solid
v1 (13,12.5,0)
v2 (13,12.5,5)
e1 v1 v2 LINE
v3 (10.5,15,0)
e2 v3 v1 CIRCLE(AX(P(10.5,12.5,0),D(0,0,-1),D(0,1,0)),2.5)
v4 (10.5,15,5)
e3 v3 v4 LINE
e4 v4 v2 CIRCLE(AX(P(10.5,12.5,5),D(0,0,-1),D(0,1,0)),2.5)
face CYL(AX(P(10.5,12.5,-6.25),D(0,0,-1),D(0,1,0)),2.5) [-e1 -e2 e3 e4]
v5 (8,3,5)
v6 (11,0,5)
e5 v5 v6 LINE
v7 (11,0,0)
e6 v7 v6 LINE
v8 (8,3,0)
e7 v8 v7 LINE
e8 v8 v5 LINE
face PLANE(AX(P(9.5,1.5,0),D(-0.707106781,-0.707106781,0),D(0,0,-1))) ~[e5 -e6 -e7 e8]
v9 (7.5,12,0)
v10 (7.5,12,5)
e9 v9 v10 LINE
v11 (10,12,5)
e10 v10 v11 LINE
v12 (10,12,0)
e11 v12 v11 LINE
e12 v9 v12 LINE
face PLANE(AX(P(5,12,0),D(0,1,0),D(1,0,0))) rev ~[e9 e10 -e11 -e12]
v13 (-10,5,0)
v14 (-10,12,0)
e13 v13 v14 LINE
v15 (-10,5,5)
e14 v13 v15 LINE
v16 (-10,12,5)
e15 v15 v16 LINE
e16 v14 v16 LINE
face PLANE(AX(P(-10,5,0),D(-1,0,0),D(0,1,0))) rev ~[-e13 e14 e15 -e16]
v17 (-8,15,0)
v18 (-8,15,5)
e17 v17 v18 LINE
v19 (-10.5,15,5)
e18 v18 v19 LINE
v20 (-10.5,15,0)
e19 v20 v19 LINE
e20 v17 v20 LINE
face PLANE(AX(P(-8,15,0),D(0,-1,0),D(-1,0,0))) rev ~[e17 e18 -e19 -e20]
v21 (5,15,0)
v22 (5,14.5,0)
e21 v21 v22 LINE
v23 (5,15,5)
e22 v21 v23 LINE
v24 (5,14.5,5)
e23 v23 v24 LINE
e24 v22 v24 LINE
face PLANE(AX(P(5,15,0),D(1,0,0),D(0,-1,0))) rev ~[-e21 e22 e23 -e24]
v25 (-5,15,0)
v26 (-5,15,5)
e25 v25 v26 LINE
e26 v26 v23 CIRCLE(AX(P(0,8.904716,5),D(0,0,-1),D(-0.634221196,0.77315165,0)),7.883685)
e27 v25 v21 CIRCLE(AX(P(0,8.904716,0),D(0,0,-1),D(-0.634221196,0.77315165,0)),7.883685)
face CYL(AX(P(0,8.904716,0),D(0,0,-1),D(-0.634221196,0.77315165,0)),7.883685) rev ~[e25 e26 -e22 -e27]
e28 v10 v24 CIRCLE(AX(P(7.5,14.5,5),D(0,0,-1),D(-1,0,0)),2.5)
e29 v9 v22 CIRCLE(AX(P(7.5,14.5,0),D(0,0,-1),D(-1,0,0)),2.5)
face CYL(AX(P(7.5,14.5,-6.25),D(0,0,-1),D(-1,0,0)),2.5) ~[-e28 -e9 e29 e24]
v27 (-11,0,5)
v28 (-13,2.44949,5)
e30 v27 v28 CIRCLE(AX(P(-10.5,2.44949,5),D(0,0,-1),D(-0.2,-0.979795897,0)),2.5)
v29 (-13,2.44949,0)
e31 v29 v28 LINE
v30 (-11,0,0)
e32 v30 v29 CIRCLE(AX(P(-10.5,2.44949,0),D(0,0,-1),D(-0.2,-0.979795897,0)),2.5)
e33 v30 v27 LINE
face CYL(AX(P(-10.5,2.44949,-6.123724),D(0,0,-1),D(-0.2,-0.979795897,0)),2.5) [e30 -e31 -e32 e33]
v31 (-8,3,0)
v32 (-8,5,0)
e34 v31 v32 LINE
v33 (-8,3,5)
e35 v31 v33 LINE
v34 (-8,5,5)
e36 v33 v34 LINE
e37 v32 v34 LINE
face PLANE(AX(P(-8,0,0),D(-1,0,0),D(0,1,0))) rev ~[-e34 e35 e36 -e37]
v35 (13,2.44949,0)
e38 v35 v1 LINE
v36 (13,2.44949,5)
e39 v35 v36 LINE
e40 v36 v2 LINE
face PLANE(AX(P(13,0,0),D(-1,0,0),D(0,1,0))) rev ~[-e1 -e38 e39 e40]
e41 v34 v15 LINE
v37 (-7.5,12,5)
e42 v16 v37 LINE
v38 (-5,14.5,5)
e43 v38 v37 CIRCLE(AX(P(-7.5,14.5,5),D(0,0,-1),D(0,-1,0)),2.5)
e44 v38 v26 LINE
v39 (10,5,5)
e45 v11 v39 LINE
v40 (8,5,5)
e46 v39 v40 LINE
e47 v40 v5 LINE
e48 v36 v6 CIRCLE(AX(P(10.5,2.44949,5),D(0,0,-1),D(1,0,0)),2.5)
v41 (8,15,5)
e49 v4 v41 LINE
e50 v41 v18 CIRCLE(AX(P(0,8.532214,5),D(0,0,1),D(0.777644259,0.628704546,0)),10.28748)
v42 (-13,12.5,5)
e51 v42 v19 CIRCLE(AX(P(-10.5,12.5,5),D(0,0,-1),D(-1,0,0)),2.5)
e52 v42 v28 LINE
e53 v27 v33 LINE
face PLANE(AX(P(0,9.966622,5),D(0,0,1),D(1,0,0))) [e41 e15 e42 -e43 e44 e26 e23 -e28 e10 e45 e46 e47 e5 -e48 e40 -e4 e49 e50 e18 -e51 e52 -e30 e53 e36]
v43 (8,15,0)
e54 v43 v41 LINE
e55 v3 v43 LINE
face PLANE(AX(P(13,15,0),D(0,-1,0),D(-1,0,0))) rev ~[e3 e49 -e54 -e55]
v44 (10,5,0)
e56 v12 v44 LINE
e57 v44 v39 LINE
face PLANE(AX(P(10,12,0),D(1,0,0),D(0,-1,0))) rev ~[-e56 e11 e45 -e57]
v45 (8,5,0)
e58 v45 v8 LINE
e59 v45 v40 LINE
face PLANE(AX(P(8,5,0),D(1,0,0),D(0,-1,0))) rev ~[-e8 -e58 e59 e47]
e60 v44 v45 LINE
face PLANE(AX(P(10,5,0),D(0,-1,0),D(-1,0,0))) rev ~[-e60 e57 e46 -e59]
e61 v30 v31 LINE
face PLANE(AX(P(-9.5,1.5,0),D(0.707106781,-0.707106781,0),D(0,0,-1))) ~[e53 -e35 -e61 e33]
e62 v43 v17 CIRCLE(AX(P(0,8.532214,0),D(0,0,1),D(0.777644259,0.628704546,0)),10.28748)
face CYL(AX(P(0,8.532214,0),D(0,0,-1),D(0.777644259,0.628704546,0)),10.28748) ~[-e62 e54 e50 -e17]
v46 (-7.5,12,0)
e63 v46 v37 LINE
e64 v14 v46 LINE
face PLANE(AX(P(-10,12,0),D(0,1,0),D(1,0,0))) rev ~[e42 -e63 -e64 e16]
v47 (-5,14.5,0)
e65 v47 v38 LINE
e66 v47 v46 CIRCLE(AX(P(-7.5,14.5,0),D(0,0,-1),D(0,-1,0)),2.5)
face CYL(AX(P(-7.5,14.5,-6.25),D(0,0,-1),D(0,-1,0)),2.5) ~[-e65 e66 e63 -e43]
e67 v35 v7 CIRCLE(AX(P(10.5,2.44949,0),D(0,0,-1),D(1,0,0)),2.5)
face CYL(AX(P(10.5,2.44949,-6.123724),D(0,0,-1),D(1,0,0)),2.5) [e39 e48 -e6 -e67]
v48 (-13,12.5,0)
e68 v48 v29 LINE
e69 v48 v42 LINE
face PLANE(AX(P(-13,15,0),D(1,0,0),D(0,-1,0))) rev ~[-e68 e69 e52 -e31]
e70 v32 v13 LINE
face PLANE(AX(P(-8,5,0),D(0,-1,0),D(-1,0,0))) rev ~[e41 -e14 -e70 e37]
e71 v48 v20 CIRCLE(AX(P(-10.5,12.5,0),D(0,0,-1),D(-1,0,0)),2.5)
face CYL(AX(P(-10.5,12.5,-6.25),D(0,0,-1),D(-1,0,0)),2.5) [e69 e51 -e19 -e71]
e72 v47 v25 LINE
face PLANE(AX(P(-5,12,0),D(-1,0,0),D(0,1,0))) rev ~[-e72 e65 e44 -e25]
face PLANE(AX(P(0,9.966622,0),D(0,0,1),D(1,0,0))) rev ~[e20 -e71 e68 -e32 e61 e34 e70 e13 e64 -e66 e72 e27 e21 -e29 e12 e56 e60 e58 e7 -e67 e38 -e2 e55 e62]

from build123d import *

# Parameters (mm, degrees)
F1_DEPTH    = 5
F2_SIZE     = 3
F3_T1_DEPTH = 17.2474487139
F3_T3_DEPTH = 17.5


# Not quite as in the source:
# - a fillet or chamfer that OpenCascade refuses, or shapes differently, is made with other operations: its cross-section is extruded or revolved along the edge and cut away or added
# - a feature names something its author has since deleted; it is built from what else it names


with BuildPart() as f1:
    # F0 (on Top) → F1 (new body)
    with BuildSketch(Plane.XY):
        with BuildLine():
            Line((-13, 12), (-13, 0))
            Line((-13, 0), (-10, 0))
            Line((-10, 0), (-8, 0))
            Line((-8, 0), (-8, 5))
            Line((-8, 5), (-10, 5))
            Line((-10, 5), (-10, 12))
            Line((-10, 12), (-5, 12))
            Line((-5, 12), (-5, 15))
            ThreePointArc((-5, 15), (0, 16.7884008853), (5, 15))
            Line((5, 15), (5, 12))
            Line((5, 12), (10, 12))
            Line((10, 12), (10, 5))
            Line((10, 5), (8, 5))
            Line((8, 5), (8, 0))
            Line((8, 0), (10, 0))
            Line((10, 0), (13, 0))
            Line((13, 0), (13, 15))
            Line((13, 15), (10, 15))
            Line((10, 15), (8, 15))
            ThreePointArc((8, 15), (0, 18.8196946698), (-8, 15))
            Line((-8, 15), (-10, 15))
            Line((-10, 15), (-13, 15))
            Line((-13, 15), (-13, 12))
        make_face()
    extrude(amount=F1_DEPTH)

    # F2
    f2_edges = [f1.edges().sort_by_distance(p)[0] for p in [
        (-8, 0, 2.5),
        (8, 0, 2.5),
    ]]
    chamfer(f2_edges, length=F2_SIZE)

    # F3: fillet of radius 2.5 on 6 edges, made by hand

    # F3_s2 → F3_t1 (cut)
    with BuildSketch(Plane.XY.offset(-6.123724357)):
        with BuildLine():
            ThreePointArc((-11, 0), (-12.4364916731, 0.8683509127), (-13, 2.4494897428))
            Line((-13, 2.4494897428), (-13, 0))
            Line((-13, 0), (-11, 0))
        make_face()
        with BuildLine():
            ThreePointArc((13, 2.4494897428), (12.4364916731, 0.8683509127), (11, 0))
            Line((11, 0), (13, 0))
            Line((13, 0), (13, 2.4494897428))
        make_face()
    extrude(amount=F3_T1_DEPTH, mode=Mode.SUBTRACT)

    # F3_s4 → F3_t3 (cut)
    with BuildSketch(Plane.XY.offset(-6.25)):
        with BuildLine():
            ThreePointArc((-13, 12.5), (-12.267766953, 14.267766953), (-10.5, 15))
            Line((-10.5, 15), (-13, 15))
            Line((-13, 15), (-13, 12.5))
        make_face()
        with BuildLine():
            ThreePointArc((10.5, 15), (12.267766953, 14.267766953), (13, 12.5))
            Line((13, 12.5), (13, 15))
            Line((13, 15), (10.5, 15))
        make_face()
        with BuildLine():
            ThreePointArc((-7.5, 12), (-5.732233047, 12.732233047), (-5, 14.5))
            Line((-5, 14.5), (-5, 12))
            Line((-5, 12), (-7.5, 12))
        make_face()
        with BuildLine():
            ThreePointArc((5, 14.5), (5.732233047, 12.732233047), (7.5, 12))
            Line((7.5, 12), (5, 12))
            Line((5, 12), (5, 14.5))
        make_face()
    extrude(amount=F3_T3_DEPTH, mode=Mode.SUBTRACT)


solid = f1.part
